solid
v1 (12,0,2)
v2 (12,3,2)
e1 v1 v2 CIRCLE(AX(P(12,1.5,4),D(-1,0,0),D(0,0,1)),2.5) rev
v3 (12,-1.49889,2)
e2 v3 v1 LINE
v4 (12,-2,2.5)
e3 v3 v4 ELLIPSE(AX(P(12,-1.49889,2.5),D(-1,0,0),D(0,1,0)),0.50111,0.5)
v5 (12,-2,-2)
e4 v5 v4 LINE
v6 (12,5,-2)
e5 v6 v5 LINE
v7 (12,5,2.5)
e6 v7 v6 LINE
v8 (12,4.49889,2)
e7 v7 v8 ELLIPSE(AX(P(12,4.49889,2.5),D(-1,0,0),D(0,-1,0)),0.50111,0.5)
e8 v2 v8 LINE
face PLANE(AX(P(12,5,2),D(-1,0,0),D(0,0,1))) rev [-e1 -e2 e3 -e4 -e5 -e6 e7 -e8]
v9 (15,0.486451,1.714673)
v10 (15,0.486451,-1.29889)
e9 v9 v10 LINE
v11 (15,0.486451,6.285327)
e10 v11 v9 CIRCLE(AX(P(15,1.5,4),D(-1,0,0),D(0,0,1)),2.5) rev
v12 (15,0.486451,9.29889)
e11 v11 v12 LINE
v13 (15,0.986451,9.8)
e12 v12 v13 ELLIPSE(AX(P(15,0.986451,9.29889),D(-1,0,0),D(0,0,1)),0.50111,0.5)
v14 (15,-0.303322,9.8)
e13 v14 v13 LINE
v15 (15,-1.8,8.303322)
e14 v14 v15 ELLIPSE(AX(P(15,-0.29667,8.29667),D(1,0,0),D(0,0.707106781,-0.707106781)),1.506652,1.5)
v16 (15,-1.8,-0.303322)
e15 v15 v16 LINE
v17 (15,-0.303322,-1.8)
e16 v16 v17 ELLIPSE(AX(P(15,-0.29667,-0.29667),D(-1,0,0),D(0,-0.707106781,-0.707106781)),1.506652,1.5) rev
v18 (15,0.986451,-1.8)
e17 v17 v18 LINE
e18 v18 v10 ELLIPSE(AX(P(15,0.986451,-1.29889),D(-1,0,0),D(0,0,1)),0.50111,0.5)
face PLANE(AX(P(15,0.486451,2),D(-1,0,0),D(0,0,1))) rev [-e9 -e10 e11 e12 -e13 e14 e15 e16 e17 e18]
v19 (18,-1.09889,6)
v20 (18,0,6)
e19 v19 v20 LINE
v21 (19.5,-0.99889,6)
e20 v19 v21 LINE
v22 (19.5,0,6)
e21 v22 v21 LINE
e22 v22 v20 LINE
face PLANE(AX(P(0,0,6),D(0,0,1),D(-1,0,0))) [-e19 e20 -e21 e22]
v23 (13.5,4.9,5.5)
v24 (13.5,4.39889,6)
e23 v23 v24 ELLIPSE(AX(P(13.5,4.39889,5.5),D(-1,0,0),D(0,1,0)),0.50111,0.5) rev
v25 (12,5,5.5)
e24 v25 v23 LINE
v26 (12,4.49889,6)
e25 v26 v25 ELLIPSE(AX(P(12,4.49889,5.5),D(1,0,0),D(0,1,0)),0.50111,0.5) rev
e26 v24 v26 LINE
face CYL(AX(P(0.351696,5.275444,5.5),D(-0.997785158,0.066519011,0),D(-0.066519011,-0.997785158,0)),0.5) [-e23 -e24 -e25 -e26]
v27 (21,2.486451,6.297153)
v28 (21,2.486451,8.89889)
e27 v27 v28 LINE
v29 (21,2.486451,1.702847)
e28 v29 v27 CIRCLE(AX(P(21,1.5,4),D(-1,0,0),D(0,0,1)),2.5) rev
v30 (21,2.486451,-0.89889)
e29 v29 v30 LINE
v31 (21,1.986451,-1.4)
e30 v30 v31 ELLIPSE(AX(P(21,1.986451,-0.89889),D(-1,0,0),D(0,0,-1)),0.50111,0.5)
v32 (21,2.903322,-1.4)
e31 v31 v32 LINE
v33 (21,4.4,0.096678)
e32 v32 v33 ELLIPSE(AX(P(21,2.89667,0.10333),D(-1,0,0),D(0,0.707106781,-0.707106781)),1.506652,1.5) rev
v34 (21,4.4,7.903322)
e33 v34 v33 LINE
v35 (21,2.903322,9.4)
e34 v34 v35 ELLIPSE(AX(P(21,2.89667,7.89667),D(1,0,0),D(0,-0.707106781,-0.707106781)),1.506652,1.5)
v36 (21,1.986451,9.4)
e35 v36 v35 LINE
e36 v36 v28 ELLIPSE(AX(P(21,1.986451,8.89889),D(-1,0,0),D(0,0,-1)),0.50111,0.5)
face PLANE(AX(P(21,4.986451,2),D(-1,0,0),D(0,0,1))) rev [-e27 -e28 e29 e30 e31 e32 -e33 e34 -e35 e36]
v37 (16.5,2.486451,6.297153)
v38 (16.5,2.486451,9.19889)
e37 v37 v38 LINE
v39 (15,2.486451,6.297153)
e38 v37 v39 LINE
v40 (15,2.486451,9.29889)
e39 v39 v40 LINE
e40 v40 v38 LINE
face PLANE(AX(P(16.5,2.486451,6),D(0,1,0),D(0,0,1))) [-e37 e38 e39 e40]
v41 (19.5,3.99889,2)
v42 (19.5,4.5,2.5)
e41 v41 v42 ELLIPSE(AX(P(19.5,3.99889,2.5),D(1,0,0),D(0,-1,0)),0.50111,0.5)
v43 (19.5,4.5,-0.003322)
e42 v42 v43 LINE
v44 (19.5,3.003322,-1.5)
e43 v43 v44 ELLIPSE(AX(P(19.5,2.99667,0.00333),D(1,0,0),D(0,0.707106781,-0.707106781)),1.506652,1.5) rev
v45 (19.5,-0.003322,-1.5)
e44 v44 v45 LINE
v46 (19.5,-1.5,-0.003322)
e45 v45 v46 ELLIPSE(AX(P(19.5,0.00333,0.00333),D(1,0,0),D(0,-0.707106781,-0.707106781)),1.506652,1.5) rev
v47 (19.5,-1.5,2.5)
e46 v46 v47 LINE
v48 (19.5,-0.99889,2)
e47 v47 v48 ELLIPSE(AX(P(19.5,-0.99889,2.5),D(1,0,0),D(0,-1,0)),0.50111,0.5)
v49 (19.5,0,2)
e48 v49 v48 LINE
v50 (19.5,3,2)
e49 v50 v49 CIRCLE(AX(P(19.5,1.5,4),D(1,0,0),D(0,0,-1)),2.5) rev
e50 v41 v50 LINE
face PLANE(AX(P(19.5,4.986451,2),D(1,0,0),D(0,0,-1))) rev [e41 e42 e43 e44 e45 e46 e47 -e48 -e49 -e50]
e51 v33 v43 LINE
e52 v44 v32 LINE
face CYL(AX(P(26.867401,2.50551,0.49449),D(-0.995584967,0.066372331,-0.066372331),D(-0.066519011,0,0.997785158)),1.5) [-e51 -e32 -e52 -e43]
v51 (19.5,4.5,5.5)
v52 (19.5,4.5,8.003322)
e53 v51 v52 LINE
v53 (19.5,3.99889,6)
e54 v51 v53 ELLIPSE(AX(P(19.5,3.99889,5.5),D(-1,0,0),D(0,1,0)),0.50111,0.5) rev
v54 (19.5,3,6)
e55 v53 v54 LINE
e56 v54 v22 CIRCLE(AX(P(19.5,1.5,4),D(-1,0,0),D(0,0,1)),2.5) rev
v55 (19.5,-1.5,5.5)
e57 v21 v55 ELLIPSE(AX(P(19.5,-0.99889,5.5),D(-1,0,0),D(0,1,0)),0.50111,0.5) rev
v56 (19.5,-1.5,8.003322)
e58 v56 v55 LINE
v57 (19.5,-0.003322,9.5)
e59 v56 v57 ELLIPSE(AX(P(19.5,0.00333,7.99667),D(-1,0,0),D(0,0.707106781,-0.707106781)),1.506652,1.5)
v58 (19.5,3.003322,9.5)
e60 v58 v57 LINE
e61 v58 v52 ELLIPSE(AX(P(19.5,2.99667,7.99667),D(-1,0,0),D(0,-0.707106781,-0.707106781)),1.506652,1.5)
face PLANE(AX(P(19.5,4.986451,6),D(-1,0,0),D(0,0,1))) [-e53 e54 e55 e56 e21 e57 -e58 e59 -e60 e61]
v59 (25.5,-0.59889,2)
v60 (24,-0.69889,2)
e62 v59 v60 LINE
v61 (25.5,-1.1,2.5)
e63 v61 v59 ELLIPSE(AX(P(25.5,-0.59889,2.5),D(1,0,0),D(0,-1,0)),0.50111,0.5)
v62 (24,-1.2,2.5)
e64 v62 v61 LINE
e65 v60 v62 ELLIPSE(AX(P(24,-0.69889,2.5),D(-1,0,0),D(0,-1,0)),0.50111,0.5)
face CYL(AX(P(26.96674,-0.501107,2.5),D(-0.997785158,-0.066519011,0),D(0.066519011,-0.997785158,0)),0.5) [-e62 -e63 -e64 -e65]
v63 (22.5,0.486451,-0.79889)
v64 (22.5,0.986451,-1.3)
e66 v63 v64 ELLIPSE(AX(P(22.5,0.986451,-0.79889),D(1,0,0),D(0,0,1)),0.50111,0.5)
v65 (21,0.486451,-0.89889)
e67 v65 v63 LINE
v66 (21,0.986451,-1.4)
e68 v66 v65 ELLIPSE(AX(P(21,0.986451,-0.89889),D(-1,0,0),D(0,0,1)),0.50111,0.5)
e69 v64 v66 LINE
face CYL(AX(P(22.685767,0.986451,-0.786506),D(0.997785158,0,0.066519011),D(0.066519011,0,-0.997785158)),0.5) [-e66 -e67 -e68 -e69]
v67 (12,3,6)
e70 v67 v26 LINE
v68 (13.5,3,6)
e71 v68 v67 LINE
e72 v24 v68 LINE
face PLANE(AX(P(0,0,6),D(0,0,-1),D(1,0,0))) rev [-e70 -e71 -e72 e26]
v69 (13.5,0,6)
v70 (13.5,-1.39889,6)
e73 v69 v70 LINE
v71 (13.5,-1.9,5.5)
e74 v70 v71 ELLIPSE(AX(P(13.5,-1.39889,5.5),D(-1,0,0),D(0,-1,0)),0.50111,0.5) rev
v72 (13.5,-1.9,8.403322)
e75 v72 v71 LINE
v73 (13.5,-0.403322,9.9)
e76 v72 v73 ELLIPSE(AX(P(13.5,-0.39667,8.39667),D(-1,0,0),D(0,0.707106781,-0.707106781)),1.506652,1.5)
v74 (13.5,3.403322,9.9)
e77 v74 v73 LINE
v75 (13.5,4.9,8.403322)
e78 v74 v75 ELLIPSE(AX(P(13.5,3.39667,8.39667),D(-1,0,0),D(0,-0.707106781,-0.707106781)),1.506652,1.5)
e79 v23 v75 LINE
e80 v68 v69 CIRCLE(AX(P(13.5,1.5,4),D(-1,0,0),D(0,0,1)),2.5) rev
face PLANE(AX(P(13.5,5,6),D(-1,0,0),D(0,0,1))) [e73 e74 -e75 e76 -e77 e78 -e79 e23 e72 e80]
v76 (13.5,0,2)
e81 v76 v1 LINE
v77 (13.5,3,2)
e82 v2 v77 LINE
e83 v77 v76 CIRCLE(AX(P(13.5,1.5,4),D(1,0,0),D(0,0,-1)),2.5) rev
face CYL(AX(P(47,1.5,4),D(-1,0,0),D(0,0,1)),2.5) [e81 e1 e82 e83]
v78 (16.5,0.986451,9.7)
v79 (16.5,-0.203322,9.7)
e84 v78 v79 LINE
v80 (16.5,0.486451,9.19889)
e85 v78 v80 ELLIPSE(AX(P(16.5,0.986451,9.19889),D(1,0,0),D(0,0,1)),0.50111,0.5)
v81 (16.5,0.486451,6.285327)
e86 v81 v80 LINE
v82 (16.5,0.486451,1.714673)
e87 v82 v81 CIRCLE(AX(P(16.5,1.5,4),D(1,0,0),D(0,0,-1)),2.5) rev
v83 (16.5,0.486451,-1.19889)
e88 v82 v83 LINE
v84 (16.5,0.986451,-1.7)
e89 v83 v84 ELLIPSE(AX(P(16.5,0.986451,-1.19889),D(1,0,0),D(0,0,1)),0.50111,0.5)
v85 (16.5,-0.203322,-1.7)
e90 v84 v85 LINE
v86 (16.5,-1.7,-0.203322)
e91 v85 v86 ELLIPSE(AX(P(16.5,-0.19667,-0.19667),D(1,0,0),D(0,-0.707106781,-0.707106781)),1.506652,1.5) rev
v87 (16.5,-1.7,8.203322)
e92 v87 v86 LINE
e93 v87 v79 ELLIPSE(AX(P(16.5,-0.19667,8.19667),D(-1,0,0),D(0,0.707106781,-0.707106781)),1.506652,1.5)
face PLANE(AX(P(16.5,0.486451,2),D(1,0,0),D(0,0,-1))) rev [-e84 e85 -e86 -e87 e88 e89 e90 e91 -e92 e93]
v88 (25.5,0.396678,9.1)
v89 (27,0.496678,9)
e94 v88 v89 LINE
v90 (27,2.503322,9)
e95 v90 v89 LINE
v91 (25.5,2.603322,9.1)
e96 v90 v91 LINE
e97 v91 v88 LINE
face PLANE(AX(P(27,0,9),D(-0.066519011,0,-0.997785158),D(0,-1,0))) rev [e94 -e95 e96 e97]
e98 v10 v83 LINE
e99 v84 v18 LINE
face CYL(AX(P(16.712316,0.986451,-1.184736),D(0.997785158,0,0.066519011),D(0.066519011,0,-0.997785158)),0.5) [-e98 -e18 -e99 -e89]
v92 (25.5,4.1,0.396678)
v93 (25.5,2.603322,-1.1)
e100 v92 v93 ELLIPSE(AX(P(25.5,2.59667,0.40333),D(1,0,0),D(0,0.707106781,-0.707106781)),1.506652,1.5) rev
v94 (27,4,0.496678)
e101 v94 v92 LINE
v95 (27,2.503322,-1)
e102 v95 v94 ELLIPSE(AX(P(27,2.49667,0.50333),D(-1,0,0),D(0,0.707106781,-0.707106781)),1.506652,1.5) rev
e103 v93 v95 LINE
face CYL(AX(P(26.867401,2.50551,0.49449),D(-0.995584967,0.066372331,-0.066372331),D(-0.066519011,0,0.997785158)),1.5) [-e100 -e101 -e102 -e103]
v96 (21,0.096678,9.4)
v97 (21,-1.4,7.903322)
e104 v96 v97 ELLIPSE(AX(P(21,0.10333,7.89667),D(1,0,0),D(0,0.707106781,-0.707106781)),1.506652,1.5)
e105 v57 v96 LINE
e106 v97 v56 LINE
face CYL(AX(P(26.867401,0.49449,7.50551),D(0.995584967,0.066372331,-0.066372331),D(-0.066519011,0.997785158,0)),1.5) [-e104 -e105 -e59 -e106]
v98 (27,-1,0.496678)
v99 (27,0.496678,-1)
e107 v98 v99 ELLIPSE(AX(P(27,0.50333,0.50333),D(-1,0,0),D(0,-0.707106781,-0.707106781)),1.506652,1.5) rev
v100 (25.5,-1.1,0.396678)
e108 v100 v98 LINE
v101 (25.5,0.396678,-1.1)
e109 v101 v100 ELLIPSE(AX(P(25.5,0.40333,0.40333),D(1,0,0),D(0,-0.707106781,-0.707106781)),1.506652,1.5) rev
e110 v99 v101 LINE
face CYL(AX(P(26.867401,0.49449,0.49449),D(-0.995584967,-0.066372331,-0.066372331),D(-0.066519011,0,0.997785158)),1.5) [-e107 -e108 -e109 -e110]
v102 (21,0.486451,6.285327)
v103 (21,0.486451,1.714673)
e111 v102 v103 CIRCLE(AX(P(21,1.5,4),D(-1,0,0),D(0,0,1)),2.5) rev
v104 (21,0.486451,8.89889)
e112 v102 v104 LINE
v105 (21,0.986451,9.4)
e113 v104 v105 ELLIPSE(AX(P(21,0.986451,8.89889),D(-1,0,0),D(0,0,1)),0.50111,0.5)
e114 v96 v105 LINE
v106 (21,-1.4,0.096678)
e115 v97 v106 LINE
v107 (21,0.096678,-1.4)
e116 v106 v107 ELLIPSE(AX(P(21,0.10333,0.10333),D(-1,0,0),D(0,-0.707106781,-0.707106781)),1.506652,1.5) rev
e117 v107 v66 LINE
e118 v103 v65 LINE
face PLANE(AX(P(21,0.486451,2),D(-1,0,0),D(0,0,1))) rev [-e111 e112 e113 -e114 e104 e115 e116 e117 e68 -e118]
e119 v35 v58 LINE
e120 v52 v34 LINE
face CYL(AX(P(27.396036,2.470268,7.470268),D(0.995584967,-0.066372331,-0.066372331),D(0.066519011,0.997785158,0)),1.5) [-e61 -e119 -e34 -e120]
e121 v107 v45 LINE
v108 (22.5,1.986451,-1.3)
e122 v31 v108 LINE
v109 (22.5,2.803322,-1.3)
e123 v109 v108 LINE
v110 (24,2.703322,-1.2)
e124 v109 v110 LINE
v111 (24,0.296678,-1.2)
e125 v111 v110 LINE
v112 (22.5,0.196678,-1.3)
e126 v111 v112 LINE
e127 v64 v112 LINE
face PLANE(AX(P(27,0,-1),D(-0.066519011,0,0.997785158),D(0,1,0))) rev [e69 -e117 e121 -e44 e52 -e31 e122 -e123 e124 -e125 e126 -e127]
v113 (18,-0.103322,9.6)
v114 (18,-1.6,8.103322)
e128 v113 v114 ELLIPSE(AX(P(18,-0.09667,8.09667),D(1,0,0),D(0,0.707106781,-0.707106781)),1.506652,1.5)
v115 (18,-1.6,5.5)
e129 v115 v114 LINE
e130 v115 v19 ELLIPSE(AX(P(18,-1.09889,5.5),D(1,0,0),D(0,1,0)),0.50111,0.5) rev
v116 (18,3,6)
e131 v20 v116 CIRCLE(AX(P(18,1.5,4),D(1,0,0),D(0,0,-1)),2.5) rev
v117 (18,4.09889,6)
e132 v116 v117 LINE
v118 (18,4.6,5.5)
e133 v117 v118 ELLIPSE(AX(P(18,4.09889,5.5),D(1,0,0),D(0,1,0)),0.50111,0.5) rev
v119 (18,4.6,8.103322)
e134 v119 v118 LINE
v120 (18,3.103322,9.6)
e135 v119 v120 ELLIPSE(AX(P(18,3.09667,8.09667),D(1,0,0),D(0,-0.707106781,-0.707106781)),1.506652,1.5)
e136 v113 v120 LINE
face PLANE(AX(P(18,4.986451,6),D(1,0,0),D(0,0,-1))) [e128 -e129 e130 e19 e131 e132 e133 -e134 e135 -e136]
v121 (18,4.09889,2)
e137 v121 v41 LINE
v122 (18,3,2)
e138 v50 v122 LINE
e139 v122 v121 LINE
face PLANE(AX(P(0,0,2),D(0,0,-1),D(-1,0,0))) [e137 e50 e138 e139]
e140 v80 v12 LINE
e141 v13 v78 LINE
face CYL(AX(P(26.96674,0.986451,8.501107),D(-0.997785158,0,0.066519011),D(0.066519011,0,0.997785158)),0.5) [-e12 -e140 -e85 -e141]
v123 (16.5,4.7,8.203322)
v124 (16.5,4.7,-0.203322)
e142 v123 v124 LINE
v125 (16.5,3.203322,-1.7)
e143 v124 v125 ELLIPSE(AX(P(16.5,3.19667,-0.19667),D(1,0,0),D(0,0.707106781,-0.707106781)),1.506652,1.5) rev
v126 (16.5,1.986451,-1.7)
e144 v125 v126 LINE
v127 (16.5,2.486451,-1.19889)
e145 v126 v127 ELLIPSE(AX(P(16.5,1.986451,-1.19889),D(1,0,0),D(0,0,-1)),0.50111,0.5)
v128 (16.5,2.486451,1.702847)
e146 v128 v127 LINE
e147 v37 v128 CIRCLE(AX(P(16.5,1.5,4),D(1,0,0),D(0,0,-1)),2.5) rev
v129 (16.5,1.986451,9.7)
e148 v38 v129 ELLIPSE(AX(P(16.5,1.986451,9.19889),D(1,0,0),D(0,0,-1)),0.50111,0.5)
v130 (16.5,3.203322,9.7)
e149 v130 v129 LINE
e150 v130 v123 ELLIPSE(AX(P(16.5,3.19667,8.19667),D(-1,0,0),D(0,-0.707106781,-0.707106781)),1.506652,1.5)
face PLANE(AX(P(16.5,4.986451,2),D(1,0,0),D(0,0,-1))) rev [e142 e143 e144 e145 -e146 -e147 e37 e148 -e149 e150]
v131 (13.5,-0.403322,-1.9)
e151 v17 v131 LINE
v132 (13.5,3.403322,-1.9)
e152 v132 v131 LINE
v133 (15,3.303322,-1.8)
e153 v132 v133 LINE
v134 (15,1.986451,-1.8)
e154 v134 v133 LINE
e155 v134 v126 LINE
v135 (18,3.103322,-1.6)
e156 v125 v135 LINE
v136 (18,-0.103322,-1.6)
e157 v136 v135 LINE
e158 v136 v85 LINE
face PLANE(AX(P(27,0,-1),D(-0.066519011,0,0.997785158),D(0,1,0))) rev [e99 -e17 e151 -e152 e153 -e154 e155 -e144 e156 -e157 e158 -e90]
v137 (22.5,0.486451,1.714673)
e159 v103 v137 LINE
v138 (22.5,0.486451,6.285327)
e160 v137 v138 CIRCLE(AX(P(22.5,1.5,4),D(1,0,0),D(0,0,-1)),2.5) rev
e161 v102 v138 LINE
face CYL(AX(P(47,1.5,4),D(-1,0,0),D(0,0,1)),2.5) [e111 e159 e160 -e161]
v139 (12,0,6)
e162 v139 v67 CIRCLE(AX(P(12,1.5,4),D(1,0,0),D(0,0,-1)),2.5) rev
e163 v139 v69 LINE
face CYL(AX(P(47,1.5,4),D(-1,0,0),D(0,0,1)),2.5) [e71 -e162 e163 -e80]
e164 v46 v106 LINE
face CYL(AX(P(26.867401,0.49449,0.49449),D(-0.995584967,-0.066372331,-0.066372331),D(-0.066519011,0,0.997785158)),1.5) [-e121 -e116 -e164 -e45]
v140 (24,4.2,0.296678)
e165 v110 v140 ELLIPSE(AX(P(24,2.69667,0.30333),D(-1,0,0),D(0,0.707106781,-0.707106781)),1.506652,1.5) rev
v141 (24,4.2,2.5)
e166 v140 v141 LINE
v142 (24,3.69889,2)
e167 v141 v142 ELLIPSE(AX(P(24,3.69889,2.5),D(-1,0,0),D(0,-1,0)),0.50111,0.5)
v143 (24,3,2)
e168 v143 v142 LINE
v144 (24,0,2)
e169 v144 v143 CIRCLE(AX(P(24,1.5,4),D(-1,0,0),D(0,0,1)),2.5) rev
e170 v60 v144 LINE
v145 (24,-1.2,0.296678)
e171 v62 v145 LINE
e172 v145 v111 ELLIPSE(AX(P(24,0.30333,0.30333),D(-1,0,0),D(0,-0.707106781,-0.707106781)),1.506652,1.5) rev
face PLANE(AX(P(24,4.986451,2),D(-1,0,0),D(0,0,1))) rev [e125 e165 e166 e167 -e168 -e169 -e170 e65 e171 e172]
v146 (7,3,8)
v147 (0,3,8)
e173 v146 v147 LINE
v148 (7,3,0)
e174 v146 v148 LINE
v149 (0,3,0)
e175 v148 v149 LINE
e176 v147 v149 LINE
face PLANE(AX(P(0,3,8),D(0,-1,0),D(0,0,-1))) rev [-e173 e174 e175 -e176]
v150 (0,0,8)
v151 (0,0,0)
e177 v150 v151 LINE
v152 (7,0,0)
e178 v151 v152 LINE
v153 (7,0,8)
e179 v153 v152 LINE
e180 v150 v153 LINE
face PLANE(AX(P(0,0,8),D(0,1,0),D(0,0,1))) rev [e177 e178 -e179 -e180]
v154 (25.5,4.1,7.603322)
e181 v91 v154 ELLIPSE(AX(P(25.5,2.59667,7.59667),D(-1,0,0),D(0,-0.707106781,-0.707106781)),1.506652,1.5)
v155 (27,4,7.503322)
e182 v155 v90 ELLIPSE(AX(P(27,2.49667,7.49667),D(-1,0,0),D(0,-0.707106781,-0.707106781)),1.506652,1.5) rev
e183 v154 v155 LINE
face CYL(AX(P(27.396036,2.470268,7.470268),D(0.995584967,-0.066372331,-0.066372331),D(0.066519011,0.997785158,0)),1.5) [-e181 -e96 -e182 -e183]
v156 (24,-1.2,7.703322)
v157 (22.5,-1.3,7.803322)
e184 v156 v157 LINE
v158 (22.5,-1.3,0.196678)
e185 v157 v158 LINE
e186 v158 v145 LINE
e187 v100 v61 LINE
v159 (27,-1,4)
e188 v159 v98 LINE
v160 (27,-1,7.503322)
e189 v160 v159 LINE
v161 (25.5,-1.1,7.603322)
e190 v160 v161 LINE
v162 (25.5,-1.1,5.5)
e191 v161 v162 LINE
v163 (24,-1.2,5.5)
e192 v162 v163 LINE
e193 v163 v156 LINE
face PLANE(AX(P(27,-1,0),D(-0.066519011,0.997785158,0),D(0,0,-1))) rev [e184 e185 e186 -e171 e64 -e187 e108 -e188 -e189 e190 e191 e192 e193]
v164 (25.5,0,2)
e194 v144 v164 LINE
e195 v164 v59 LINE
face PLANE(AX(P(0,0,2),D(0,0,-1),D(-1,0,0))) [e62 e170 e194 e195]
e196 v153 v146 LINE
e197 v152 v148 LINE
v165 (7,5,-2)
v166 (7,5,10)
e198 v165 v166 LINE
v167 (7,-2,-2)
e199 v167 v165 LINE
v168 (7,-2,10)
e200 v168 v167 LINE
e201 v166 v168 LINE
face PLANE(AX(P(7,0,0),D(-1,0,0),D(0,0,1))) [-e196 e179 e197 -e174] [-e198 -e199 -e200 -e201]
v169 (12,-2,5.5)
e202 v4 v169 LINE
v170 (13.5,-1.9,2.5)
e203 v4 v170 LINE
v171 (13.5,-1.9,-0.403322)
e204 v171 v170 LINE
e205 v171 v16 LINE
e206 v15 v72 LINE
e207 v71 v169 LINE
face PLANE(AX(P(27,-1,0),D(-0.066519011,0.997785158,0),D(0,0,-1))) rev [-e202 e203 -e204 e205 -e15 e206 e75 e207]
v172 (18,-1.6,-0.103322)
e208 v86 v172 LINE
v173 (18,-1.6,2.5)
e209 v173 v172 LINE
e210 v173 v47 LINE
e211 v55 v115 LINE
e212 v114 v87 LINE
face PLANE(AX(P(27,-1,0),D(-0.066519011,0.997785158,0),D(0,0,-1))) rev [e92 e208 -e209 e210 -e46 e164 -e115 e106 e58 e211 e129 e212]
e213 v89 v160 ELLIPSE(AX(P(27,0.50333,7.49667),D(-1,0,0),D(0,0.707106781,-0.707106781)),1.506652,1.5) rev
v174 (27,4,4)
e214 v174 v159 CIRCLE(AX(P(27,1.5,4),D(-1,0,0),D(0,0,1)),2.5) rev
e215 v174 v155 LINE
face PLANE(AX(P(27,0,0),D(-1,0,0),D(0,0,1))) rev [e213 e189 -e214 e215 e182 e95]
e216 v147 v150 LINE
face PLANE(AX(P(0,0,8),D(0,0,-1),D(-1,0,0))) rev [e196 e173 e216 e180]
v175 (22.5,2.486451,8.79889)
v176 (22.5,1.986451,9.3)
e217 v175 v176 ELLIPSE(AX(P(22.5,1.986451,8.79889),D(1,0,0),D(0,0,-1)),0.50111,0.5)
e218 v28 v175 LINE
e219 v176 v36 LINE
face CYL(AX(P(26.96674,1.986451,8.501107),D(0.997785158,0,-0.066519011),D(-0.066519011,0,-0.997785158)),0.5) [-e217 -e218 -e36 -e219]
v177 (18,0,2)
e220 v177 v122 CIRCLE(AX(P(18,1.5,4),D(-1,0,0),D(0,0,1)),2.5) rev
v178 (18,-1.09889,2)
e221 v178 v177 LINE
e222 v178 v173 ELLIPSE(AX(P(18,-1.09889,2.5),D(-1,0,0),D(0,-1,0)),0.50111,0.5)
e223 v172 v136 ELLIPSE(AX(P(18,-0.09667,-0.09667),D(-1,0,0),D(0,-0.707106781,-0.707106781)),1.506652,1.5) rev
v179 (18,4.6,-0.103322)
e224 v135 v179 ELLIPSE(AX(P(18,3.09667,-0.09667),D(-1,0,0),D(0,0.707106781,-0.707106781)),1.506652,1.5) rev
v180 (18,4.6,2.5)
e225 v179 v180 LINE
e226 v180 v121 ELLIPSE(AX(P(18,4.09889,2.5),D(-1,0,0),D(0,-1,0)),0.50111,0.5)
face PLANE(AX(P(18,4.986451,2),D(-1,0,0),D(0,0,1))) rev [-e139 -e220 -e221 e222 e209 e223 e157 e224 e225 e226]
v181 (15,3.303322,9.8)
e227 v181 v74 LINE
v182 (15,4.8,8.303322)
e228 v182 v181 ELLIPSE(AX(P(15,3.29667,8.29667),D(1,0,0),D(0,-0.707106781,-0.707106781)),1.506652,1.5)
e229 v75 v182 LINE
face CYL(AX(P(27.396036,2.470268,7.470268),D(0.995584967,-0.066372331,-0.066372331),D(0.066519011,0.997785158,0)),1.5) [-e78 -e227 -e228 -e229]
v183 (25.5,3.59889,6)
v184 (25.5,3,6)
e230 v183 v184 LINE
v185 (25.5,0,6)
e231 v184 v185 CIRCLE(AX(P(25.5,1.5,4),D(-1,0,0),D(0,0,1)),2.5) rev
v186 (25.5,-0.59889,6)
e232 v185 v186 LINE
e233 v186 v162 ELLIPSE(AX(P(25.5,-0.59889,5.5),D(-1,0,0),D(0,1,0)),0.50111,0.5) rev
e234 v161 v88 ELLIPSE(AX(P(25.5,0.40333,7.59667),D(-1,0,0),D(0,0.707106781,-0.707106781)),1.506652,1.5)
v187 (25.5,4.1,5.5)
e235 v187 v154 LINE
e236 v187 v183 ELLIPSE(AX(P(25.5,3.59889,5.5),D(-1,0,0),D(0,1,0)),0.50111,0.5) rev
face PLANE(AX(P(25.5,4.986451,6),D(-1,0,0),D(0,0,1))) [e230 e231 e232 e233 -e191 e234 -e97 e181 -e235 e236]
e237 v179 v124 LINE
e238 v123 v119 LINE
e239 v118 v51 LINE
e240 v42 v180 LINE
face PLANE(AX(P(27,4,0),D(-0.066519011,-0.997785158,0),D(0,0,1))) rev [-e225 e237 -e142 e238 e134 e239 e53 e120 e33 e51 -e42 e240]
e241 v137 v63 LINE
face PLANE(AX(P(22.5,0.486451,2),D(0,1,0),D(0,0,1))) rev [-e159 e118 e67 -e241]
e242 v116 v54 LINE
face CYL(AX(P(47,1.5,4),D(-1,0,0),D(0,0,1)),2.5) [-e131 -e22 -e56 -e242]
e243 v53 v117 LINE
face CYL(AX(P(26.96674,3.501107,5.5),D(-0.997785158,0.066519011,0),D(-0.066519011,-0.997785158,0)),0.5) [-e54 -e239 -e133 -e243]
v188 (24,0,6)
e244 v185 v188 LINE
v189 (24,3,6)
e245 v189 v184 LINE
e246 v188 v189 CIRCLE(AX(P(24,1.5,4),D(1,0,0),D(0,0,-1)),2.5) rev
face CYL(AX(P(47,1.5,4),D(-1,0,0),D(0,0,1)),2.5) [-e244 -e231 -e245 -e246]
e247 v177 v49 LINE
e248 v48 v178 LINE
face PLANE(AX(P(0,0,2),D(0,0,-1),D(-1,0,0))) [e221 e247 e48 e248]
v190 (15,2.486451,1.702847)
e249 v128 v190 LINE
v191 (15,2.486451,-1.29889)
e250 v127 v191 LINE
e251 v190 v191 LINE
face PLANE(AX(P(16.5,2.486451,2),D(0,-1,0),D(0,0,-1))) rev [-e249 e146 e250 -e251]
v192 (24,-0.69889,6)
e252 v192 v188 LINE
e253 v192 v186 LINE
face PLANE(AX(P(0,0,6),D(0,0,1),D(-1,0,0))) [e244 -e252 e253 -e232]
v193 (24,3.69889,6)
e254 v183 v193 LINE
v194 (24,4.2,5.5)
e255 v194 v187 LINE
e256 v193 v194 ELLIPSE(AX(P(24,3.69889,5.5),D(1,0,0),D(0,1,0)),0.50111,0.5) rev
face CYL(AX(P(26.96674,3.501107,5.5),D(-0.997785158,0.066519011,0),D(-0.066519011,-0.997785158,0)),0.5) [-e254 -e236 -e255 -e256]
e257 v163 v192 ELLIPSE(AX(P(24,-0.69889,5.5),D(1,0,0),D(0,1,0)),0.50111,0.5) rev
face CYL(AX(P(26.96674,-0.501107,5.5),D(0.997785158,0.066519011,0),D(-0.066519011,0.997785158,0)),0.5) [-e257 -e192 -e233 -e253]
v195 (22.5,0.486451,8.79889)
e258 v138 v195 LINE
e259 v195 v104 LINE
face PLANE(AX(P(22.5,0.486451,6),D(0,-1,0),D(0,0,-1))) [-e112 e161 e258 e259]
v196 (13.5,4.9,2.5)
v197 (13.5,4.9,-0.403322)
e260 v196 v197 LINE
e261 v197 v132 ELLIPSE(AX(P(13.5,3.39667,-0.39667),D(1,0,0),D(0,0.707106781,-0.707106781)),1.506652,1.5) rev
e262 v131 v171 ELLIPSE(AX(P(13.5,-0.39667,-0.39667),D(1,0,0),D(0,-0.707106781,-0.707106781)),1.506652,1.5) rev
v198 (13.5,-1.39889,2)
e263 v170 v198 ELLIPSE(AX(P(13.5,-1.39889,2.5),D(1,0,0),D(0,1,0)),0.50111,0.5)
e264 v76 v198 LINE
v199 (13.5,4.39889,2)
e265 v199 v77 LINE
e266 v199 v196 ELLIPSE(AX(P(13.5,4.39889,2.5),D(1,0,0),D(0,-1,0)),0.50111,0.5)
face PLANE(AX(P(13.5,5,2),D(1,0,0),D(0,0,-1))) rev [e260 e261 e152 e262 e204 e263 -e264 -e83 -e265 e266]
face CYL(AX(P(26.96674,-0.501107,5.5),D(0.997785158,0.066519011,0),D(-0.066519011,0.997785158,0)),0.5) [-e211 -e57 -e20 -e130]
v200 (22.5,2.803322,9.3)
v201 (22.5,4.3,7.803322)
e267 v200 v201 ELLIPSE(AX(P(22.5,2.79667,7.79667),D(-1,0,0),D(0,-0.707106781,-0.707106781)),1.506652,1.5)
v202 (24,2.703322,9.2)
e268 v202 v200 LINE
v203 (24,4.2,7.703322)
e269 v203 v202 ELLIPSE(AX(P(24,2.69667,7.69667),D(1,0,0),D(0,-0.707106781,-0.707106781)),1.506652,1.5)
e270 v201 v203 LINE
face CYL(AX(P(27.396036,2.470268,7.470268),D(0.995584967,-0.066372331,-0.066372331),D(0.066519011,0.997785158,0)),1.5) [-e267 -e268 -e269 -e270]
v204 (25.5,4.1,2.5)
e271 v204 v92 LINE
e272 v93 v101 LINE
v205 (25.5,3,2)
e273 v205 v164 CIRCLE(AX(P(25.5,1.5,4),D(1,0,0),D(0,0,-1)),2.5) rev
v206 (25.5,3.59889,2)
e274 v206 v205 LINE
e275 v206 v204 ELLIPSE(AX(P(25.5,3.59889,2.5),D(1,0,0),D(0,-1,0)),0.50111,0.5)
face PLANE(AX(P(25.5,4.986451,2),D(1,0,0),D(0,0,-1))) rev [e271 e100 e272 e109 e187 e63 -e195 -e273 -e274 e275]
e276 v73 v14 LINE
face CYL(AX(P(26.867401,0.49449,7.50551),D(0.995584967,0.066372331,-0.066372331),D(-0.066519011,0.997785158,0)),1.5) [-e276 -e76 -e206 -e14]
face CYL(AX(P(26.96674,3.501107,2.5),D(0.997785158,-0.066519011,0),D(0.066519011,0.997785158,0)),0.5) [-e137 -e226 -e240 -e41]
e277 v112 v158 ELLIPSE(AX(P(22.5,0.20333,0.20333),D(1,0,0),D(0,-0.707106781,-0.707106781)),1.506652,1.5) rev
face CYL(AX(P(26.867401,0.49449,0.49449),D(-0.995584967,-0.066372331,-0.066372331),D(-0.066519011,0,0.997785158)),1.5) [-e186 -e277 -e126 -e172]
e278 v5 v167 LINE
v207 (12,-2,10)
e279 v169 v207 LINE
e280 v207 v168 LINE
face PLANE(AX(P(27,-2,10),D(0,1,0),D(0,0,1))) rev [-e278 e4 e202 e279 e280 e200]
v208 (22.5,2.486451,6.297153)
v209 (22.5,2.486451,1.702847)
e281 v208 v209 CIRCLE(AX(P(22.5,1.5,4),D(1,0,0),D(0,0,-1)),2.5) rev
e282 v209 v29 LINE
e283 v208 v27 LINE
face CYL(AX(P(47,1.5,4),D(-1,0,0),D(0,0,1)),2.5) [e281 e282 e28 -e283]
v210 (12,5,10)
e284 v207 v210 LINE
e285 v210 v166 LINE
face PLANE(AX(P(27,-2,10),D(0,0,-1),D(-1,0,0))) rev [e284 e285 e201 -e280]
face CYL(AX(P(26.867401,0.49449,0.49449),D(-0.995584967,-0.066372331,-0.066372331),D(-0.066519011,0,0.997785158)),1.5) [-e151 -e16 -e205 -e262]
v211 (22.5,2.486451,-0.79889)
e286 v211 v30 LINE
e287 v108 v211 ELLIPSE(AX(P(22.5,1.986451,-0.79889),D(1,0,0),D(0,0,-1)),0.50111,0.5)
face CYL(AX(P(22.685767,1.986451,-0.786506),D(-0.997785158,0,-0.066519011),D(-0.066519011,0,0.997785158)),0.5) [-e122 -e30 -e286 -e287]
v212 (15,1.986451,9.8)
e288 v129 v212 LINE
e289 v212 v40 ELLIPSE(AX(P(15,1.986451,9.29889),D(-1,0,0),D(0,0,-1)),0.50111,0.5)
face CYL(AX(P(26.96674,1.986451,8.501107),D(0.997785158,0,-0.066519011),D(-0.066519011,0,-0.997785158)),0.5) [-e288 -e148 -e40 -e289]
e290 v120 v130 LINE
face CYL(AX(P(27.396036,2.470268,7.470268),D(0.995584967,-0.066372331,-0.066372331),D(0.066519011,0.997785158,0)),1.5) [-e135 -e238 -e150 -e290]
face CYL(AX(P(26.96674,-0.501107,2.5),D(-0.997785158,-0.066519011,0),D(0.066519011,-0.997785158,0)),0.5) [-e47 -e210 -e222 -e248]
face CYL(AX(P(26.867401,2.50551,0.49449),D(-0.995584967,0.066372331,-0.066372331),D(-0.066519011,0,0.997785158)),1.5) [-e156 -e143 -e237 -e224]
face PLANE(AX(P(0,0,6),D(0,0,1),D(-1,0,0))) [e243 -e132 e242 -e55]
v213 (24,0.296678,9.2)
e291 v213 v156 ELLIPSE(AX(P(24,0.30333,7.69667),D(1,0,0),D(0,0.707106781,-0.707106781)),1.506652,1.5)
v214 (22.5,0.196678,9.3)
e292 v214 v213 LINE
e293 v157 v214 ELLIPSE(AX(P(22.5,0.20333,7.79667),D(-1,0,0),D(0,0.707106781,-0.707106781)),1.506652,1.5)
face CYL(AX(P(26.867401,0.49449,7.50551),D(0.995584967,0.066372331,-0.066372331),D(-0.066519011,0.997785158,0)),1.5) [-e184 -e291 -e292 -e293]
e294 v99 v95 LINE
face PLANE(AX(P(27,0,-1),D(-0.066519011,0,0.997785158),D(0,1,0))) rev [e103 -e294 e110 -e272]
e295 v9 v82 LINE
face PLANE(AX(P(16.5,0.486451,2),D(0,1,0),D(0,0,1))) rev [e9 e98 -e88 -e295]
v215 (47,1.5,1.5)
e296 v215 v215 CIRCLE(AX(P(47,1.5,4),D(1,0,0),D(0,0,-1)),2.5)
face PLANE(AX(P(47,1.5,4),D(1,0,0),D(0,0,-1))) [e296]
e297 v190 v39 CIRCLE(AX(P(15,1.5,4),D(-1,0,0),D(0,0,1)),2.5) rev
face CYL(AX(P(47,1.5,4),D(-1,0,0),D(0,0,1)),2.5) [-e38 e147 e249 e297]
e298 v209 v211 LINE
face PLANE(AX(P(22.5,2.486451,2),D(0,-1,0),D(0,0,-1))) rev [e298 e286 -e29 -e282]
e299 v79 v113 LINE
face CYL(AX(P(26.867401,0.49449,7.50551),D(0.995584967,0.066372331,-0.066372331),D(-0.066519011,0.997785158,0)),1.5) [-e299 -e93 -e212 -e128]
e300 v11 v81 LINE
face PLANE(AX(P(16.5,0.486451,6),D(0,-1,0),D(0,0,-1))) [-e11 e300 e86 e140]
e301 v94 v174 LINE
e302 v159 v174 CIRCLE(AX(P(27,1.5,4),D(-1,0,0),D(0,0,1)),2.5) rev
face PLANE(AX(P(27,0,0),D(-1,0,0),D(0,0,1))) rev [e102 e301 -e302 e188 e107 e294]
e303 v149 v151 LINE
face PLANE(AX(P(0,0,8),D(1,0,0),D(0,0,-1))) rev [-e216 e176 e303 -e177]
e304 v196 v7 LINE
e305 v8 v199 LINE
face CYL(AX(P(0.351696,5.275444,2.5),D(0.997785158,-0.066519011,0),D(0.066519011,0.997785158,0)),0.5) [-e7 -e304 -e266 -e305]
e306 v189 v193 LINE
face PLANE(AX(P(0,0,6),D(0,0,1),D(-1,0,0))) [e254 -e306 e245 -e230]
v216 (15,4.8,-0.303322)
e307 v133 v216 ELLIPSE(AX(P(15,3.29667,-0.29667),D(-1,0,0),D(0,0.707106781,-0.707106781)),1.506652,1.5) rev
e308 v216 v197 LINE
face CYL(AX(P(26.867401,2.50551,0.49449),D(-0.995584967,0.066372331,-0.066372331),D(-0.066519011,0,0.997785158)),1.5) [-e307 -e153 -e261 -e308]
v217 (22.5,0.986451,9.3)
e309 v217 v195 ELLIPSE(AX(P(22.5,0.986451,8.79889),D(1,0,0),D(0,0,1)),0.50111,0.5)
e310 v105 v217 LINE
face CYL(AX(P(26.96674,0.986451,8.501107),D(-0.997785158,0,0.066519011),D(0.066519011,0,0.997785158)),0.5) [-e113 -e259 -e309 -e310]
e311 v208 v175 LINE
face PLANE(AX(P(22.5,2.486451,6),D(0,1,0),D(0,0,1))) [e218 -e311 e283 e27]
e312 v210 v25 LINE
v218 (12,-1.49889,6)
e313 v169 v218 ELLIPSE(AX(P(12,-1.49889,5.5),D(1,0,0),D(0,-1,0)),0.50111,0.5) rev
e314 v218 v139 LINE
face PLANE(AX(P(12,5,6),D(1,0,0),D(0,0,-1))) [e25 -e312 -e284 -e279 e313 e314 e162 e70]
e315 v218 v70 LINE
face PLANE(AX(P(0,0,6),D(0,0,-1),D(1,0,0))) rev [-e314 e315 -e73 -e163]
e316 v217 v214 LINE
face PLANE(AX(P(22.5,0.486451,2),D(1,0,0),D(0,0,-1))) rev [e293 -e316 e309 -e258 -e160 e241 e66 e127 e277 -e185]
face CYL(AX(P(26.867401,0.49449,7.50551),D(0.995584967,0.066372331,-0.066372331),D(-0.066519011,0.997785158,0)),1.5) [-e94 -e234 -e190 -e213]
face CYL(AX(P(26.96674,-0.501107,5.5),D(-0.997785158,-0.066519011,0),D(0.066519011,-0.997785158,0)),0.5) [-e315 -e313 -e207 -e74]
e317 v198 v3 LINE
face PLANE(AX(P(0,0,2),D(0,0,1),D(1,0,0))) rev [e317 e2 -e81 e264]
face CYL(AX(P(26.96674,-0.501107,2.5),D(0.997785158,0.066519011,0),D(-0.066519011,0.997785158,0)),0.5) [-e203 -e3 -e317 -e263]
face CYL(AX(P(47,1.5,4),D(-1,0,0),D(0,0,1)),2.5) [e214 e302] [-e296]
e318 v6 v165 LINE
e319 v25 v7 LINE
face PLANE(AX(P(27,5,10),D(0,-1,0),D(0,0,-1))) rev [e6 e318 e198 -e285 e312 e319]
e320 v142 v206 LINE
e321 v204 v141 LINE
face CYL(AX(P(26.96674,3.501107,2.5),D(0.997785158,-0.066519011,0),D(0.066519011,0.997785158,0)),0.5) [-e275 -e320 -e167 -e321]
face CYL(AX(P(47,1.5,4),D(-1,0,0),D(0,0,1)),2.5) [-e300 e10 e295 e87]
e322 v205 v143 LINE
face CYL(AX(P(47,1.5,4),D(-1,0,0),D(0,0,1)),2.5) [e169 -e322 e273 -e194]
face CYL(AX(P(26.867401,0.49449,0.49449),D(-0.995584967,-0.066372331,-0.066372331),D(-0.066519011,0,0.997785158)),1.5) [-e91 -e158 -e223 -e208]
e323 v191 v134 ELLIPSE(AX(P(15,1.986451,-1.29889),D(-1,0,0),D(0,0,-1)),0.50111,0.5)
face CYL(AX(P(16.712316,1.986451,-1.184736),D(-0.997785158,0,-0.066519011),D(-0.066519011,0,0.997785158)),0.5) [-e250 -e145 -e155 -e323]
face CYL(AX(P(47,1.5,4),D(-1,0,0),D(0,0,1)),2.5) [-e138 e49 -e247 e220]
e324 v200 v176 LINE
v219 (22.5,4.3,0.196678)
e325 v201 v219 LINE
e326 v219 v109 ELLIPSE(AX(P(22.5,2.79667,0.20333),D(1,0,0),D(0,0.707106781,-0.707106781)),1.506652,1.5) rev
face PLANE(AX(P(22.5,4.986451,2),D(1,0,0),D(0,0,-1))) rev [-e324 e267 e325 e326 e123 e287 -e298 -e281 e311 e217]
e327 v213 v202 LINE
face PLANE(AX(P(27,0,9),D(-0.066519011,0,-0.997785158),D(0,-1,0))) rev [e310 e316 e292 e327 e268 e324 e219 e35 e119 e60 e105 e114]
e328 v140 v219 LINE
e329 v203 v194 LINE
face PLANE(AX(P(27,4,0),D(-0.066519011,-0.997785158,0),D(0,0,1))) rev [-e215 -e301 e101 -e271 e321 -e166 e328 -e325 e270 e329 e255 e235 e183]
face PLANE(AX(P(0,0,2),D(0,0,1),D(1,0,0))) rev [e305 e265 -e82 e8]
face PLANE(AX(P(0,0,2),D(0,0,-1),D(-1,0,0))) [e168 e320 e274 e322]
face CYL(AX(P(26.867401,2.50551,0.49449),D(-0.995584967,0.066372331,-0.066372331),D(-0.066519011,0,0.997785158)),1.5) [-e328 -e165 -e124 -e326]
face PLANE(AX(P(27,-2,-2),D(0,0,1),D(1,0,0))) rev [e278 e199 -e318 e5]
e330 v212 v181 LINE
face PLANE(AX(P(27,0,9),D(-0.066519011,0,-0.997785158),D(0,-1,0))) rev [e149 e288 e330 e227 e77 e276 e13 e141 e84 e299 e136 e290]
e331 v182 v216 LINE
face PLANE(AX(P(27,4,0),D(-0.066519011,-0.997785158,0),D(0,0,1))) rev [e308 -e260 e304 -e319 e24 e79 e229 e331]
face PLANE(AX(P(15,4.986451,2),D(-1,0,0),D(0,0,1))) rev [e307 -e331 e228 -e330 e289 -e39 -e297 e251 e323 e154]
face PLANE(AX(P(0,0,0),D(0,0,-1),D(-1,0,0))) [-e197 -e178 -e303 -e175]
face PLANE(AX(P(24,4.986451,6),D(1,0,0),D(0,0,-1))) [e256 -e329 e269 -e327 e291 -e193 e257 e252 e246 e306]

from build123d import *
from OCP.BRepFilletAPI import BRepFilletAPI_MakeChamfer

# Parameters (mm, degrees)
SKETCH_1_W           = 7
SKETCH_1_H           = 3
EXTRUDE_1_DEPTH      = 8
SKETCH_2_W           = 12
SKETCH_2_H           = 7
EXTRUDE_2_DEPTH      = 20
CHAMFER_1_SIZE       = 15
CHAMFER_1_SIZE2      = 1
SKETCH_4_W           = 1.5
SKETCH_4_H           = 2.5
SKETCH_4_H_2         = 2.51354888
SKETCH_4_H_3         = 2.48645112
CUT_EXTRUDE_1_DEPTH  = 4
FILLET_1_R           = 1.5
SKETCH_9_W           = 1.5
SKETCH_9_H           = 2
CUT_EXTRUDE_3_DEPTH  = 4
SKETCH_10_W          = 1.5
SKETCH_10_H          = 4
CUT_EXTRUDE_4_DEPTH  = 2.5
EXTRUDE_3_DEPTH      = 20
EXTRUDE_3_DEPTH_BACK = 20
SKETCH_11_R          = 2.5
FILLET_2_R           = 0.5
FILLET_3_R           = 0.5
FILLET_4_R           = 0.5
FILLET_5_R           = 0.5


with BuildPart() as part:
    # Эскиз1 → Бобышка-Вытянуть1 (new body)
    with BuildSketch(Plane.XY):
        with Locations((3.5, 1.5)):
            Rectangle(SKETCH_1_W, SKETCH_1_H)
    extrude(amount=EXTRUDE_1_DEPTH)

    # Эскиз2 → Бобышка-Вытянуть2 (add)
    with BuildSketch(Plane(origin=(7, 0, 0), x_dir=(0, 0, -1), z_dir=(1, 0, 0))):
        with Locations((-4, 1.5)):
            Rectangle(SKETCH_2_W, SKETCH_2_H)
    extrude(amount=EXTRUDE_2_DEPTH)

    # Фаска1: one chamfer whose edges measure the first distance from different faces: ONE call of the kernel's chamfer builder (chamfer() names one face for all edges)
    chamfer_1_edges_1 = [part.edges().sort_by_distance(p)[0] for p in [
        (27, 1.5, 10),
    ]]
    chamfer_1_side_1 = [part.faces().sort_by_distance(p)[0] for p in [
        (17, 1.5, 10),
    ]]
    chamfer_1_edges_2 = [part.edges().sort_by_distance(p)[0] for p in [
        (27, -2, 4),
    ]]
    chamfer_1_side_2 = [part.faces().sort_by_distance(p)[0] for p in [
        (17, -2, 4),
    ]]
    chamfer_1_edges_3 = [part.edges().sort_by_distance(p)[0] for p in [
        (27, 1.5, -2),
    ]]
    chamfer_1_side_3 = [part.faces().sort_by_distance(p)[0] for p in [
        (17, 1.5, -2),
    ]]
    chamfer_1_edges_4 = [part.edges().sort_by_distance(p)[0] for p in [
        (27, 5, 4),
    ]]
    chamfer_1_side_4 = [part.faces().sort_by_distance(p)[0] for p in [
        (17, 5, 4),
    ]]
    chamfer_1 = BRepFilletAPI_MakeChamfer(part.part.solid().wrapped)
    for e in chamfer_1_edges_1:
        chamfer_1.Add(CHAMFER_1_SIZE, CHAMFER_1_SIZE2, e.wrapped, chamfer_1_side_1[0].wrapped)  # the first distance lies on this face
    for e in chamfer_1_edges_2:
        chamfer_1.Add(CHAMFER_1_SIZE, CHAMFER_1_SIZE2, e.wrapped, chamfer_1_side_2[0].wrapped)  # the first distance lies on this face
    for e in chamfer_1_edges_3:
        chamfer_1.Add(CHAMFER_1_SIZE, CHAMFER_1_SIZE2, e.wrapped, chamfer_1_side_3[0].wrapped)  # the first distance lies on this face
    for e in chamfer_1_edges_4:
        chamfer_1.Add(CHAMFER_1_SIZE, CHAMFER_1_SIZE2, e.wrapped, chamfer_1_side_4[0].wrapped)  # the first distance lies on this face
    add(Compound.cast(chamfer_1.Shape()), mode=Mode.REPLACE)

    # Эскиз4 → Вырез-Вытянуть1 (cut)
    with BuildSketch(Plane(origin=(0, 0, -2), x_dir=(-1, 0, 0), z_dir=(0, 0, -1))):
        with Locations((-24.75, 3.73645112)):
            Rectangle(SKETCH_4_W, SKETCH_4_H)
        with Locations((-21.75, 3.73645112)):
            Rectangle(SKETCH_4_W, SKETCH_4_H)
        with Locations((-18.75, 3.73645112)):
            Rectangle(SKETCH_4_W, SKETCH_4_H)
        with Locations((-15.75, 3.73645112)):
            Rectangle(SKETCH_4_W, SKETCH_4_H)
        with Locations((-12.75, 3.74322556)):
            Rectangle(SKETCH_4_W, SKETCH_4_H_2)
        with Locations((-21.75, -0.76354888)):
            Rectangle(SKETCH_4_W, SKETCH_4_H)
        with Locations((-18.75, -0.76354888)):
            Rectangle(SKETCH_4_W, SKETCH_4_H)
        with Locations((-15.75, -0.76354888)):
            Rectangle(SKETCH_4_W, SKETCH_4_H)
        with Locations((-12.75, -0.75677444)):
            Rectangle(SKETCH_4_W, SKETCH_4_H_3)
        with Locations((-24.75, -0.76354888)):
            Rectangle(SKETCH_4_W, SKETCH_4_H)
    cut_extrude_1 = extrude(amount=-CUT_EXTRUDE_1_DEPTH, mode=Mode.SUBTRACT)

    # Зеркальное отражение1: Вырез-Вытянуть1 across plane
    add(cut_extrude_1.mirror(Plane.XY.offset(4)), mode=Mode.SUBTRACT)

    # Скругление1
    fillet_1_edges = [part.edges().sort_by_distance(p)[0] for p in [
        (20.25, -1.45, -1.45),
        (17.25, -1.65, -1.65),
        (14.25, -1.85, -1.85),
        (23.25, -1.25, -1.25),
        (26.25, 4.05, 9.05),
        (23.25, 4.25, 9.25),
        (20.25, 4.45, 9.45),
        (17.25, 4.65, 9.65),
        (14.25, 4.85, 9.85),
        (23.25, -1.25, 9.25),
        (20.25, -1.45, 9.45),
        (17.25, -1.65, 9.65),
        (26.25, -1.05, -1.05),
        (14.25, -1.85, 9.85),
        (26.25, 4.05, -1.05),
        (26.25, -1.05, 9.05),
        (23.25, 4.25, -1.25),
        (20.25, 4.45, -1.45),
        (17.25, 4.65, -1.65),
        (14.25, 4.85, -1.85),
    ]]
    fillet(fillet_1_edges, radius=FILLET_1_R)

    # Эскиз9 → Вырез-Вытянуть3 (cut)
    with BuildSketch(Plane.XY.offset(10)):
        with Locations((12.75, 1.48645112)):
            Rectangle(SKETCH_9_W, SKETCH_9_H)
        with Locations((18.75, 1.48645112)):
            Rectangle(SKETCH_9_W, SKETCH_9_H)
        with Locations((24.75, 1.48645112)):
            Rectangle(SKETCH_9_W, SKETCH_9_H)
    cut_extrude_3 = extrude(amount=-CUT_EXTRUDE_3_DEPTH, mode=Mode.SUBTRACT)

    # Зеркальное отражение2: Вырез-Вытянуть3 across plane
    add(cut_extrude_3.mirror(Plane.XY.offset(4)), mode=Mode.SUBTRACT)

    # Эскиз10 → Вырез-Вытянуть4 (cut)
    with BuildSketch(Plane(origin=(0, 5, 0), x_dir=(1, 0, 0), z_dir=(0, 1, 0))):
        with Locations((15.75, -4)):
            Rectangle(SKETCH_10_W, SKETCH_10_H)
        with Locations((21.75, -4)):
            Rectangle(SKETCH_10_W, SKETCH_10_H)
    cut_extrude_4 = extrude(amount=-CUT_EXTRUDE_4_DEPTH, mode=Mode.SUBTRACT)

    # Зеркальное отражение3: Вырез-Вытянуть4 across plane
    add(cut_extrude_4.mirror(Plane.ZX.offset(1.5)), mode=Mode.SUBTRACT)

    # Эскиз11 → Бобышка-Вытянуть3 (add, two sides: drawn at the far end of the back side and taken through both)
    with BuildSketch(Plane(origin=(27, 0, 0), x_dir=(0, 0, -1), z_dir=(1, 0, 0)).offset(-EXTRUDE_3_DEPTH_BACK)):
        with Locations(Location((-4, 1.5, 0), (0, 0, 270))):
            Circle(SKETCH_11_R)
    extrude(amount=EXTRUDE_3_DEPTH + EXTRUDE_3_DEPTH_BACK)

    # Скругление2
    # the kernel refuses this fillet: 0.5 mm, written as the material it takes off along each edge
    with BuildSketch(Plane(origin=(20.747231447, -1.416851237, 2), x_dir=(-0.06651901052377394, 0.997785157856609, 0), z_dir=(-0.9977851578566089, -0.06651901052377394, 0))) as fillet_2_piece_1_section:
        with BuildLine():
            CenterArc((FILLET_2_R, -FILLET_2_R), FILLET_2_R, 90, 90)
            Line((0, -FILLET_2_R), (0, 0))
            Line((0, 0), (FILLET_2_R, 0))
        make_face()
    fillet_2_piece_1 = extrude(amount=4.003329638, mode=Mode.PRIVATE)
    fillet_2_piece_1 = split(fillet_2_piece_1, bisect_by=Plane(origin=(19.5, -1.436551172, 2.113197557), z_dir=(-1, 0, 0)), keep=Keep.TOP, mode=Mode.PRIVATE)
    fillet_2_piece_1 = split(fillet_2_piece_1, bisect_by=Plane(origin=(18, -1.436551172, 2.113197557), z_dir=(1, 0, 0)), keep=Keep.TOP, mode=Mode.PRIVATE)
    add(fillet_2_piece_1, mode=Mode.SUBTRACT)
    with BuildSketch(Plane(origin=(14.747231447, -1.816851237, 2), x_dir=(0, 0, 1), z_dir=(-0.9977851578566089, -0.06651901052377394, 0))) as fillet_2_piece_2_section:
        with BuildLine():
            CenterArc((FILLET_2_R, FILLET_2_R), FILLET_2_R, 180, 90)
            Line((0, FILLET_2_R), (0, 0))
            Line((0, 0), (FILLET_2_R, 0))
        make_face()
    fillet_2_piece_2 = extrude(amount=4.003329638, mode=Mode.PRIVATE)
    fillet_2_piece_2 = split(fillet_2_piece_2, bisect_by=Plane(origin=(12, -1.836551172, 2.113197557), z_dir=(1, 0, 0)), keep=Keep.TOP, mode=Mode.PRIVATE)
    fillet_2_piece_2 = split(fillet_2_piece_2, bisect_by=Plane(origin=(13.5, -1.836551172, 2.113197557), z_dir=(-1, 0, 0)), keep=Keep.TOP, mode=Mode.PRIVATE)
    add(fillet_2_piece_2, mode=Mode.SUBTRACT)
    with BuildSketch(Plane(origin=(26.747231447, -1.016851237, 2), x_dir=(0, 0, 1), z_dir=(-0.9977851578566089, -0.06651901052377394, 0))) as fillet_2_piece_3_section:
        with BuildLine():
            CenterArc((FILLET_2_R, FILLET_2_R), FILLET_2_R, 180, 90)
            Line((0, FILLET_2_R), (0, 0))
            Line((0, 0), (FILLET_2_R, 0))
        make_face()
    fillet_2_piece_3 = extrude(amount=4.003329638, mode=Mode.PRIVATE)
    fillet_2_piece_3 = split(fillet_2_piece_3, bisect_by=Plane(origin=(25.5, -1.036551172, 2.113197557), z_dir=(-1, 0, 0)), keep=Keep.TOP, mode=Mode.PRIVATE)
    fillet_2_piece_3 = split(fillet_2_piece_3, bisect_by=Plane(origin=(24, -1.036551172, 2.113197557), z_dir=(1, 0, 0)), keep=Keep.TOP, mode=Mode.PRIVATE)
    add(fillet_2_piece_3, mode=Mode.SUBTRACT)
    with BuildSketch(Plane(origin=(20.747231447, -1.416851237, 6), x_dir=(0, 0, -1), z_dir=(-0.9977851578566089, -0.06651901052377394, 0))) as fillet_2_piece_4_section:
        with BuildLine():
            CenterArc((FILLET_2_R, -FILLET_2_R), FILLET_2_R, 90, 90)
            Line((0, -FILLET_2_R), (0, 0))
            Line((0, 0), (FILLET_2_R, 0))
        make_face()
    fillet_2_piece_4 = extrude(amount=4.003329638, mode=Mode.PRIVATE)
    fillet_2_piece_4 = split(fillet_2_piece_4, bisect_by=Plane(origin=(18, -1.436551172, 5.886802443), z_dir=(1, 0, 0)), keep=Keep.TOP, mode=Mode.PRIVATE)
    fillet_2_piece_4 = split(fillet_2_piece_4, bisect_by=Plane(origin=(19.5, -1.436551172, 5.886802443), z_dir=(-1, 0, 0)), keep=Keep.TOP, mode=Mode.PRIVATE)
    add(fillet_2_piece_4, mode=Mode.SUBTRACT)
    with BuildSketch(Plane(origin=(14.747231447, -1.816851237, 6), x_dir=(0, 0, -1), z_dir=(-0.9977851578566089, -0.06651901052377394, 0))) as fillet_2_piece_5_section:
        with BuildLine():
            CenterArc((FILLET_2_R, -FILLET_2_R), FILLET_2_R, 90, 90)
            Line((0, -FILLET_2_R), (0, 0))
            Line((0, 0), (FILLET_2_R, 0))
        make_face()
    fillet_2_piece_5 = extrude(amount=4.003329638, mode=Mode.PRIVATE)
    fillet_2_piece_5 = split(fillet_2_piece_5, bisect_by=Plane(origin=(12, -1.836551172, 5.886802443), z_dir=(1, 0, 0)), keep=Keep.TOP, mode=Mode.PRIVATE)
    fillet_2_piece_5 = split(fillet_2_piece_5, bisect_by=Plane(origin=(13.5, -1.836551172, 5.886802443), z_dir=(-1, 0, 0)), keep=Keep.TOP, mode=Mode.PRIVATE)
    add(fillet_2_piece_5, mode=Mode.SUBTRACT)
    with BuildSketch(Plane(origin=(26.747231447, -1.016851237, 6), x_dir=(0, 0, -1), z_dir=(-0.9977851578566089, -0.06651901052377394, 0))) as fillet_2_piece_6_section:
        with BuildLine():
            CenterArc((FILLET_2_R, -FILLET_2_R), FILLET_2_R, 90, 90)
            Line((0, -FILLET_2_R), (0, 0))
            Line((0, 0), (FILLET_2_R, 0))
        make_face()
    fillet_2_piece_6 = extrude(amount=4.003329638, mode=Mode.PRIVATE)
    fillet_2_piece_6 = split(fillet_2_piece_6, bisect_by=Plane(origin=(24, -1.036551172, 5.886802443), z_dir=(1, 0, 0)), keep=Keep.TOP, mode=Mode.PRIVATE)
    fillet_2_piece_6 = split(fillet_2_piece_6, bisect_by=Plane(origin=(25.5, -1.036551172, 5.886802443), z_dir=(-1, 0, 0)), keep=Keep.TOP, mode=Mode.PRIVATE)
    add(fillet_2_piece_6, mode=Mode.SUBTRACT)

    # Скругление3
    fillet_3_edges = [part.edges().sort_by_distance(p)[0] for p in [
        (21.75, 2.48645112, 9.35),
        (15.75, 2.48645112, 9.75),
        (21.75, 0.48645112, 9.35),
        (15.75, 0.48645112, 9.75),
    ]]
    fillet(fillet_3_edges, radius=FILLET_3_R)

    # Скругление4
    # the kernel refuses this fillet: 0.5 mm, written as the material it takes off along each edge
    with BuildSketch(Plane(origin=(14.747231447, 4.816851237, 2), x_dir=(0, 0, 1), z_dir=(-0.9977851578566089, 0.06651901052377394, 0))) as fillet_4_piece_1_section:
        with BuildLine():
            CenterArc((FILLET_4_R, -FILLET_4_R), FILLET_4_R, 90, 90)
            Line((0, -FILLET_4_R), (0, 0))
            Line((0, 0), (FILLET_4_R, 0))
        make_face()
    fillet_4_piece_1 = extrude(amount=4.003329638, mode=Mode.PRIVATE)
    fillet_4_piece_1 = split(fillet_4_piece_1, bisect_by=Plane(origin=(12, 4.836551172, 2.113197557), z_dir=(1, 0, 0)), keep=Keep.TOP, mode=Mode.PRIVATE)
    fillet_4_piece_1 = split(fillet_4_piece_1, bisect_by=Plane(origin=(13.5, 4.836551172, 2.113197557), z_dir=(-1, 0, 0)), keep=Keep.TOP, mode=Mode.PRIVATE)
    add(fillet_4_piece_1, mode=Mode.SUBTRACT)
    with BuildSketch(Plane(origin=(22.752768553, 4.283148763, 6), x_dir=(0, 0, -1), z_dir=(0.9977851578566089, -0.06651901052377394, 0))) as fillet_4_piece_2_section:
        with BuildLine():
            CenterArc((FILLET_4_R, -FILLET_4_R), FILLET_4_R, 90, 90)
            Line((0, -FILLET_4_R), (0, 0))
            Line((0, 0), (FILLET_4_R, 0))
        make_face()
    fillet_4_piece_2 = extrude(amount=4.003329638, mode=Mode.PRIVATE)
    fillet_4_piece_2 = split(fillet_4_piece_2, bisect_by=Plane(origin=(25.5, 4.036551172, 5.886802443), z_dir=(-1, 0, 0)), keep=Keep.TOP, mode=Mode.PRIVATE)
    fillet_4_piece_2 = split(fillet_4_piece_2, bisect_by=Plane(origin=(24, 4.036551172, 5.886802443), z_dir=(1, 0, 0)), keep=Keep.TOP, mode=Mode.PRIVATE)
    add(fillet_4_piece_2, mode=Mode.SUBTRACT)
    with BuildSketch(Plane(origin=(16.752768553, 4.683148763, 6), x_dir=(-0.06651901052377394, -0.997785157856609, 0), z_dir=(0.9977851578566089, -0.06651901052377394, 0))) as fillet_4_piece_3_section:
        with BuildLine():
            CenterArc((FILLET_4_R, FILLET_4_R), FILLET_4_R, 180, 90)
            Line((0, FILLET_4_R), (0, 0))
            Line((0, 0), (FILLET_4_R, 0))
        make_face()
    fillet_4_piece_3 = extrude(amount=4.003329638, mode=Mode.PRIVATE)
    fillet_4_piece_3 = split(fillet_4_piece_3, bisect_by=Plane(origin=(18, 4.436551172, 5.886802443), z_dir=(1, 0, 0)), keep=Keep.TOP, mode=Mode.PRIVATE)
    fillet_4_piece_3 = split(fillet_4_piece_3, bisect_by=Plane(origin=(19.5, 4.436551172, 5.886802443), z_dir=(-1, 0, 0)), keep=Keep.TOP, mode=Mode.PRIVATE)
    add(fillet_4_piece_3, mode=Mode.SUBTRACT)
    with BuildSketch(Plane(origin=(14.747231447, 4.816851237, 6), x_dir=(0, 0, -1), z_dir=(-0.9977851578566089, 0.06651901052377394, 0))) as fillet_4_piece_4_section:
        with BuildLine():
            CenterArc((FILLET_4_R, FILLET_4_R), FILLET_4_R, 180, 90)
            Line((0, FILLET_4_R), (0, 0))
            Line((0, 0), (FILLET_4_R, 0))
        make_face()
    fillet_4_piece_4 = extrude(amount=4.003329638, mode=Mode.PRIVATE)
    fillet_4_piece_4 = split(fillet_4_piece_4, bisect_by=Plane(origin=(13.5, 4.836551172, 5.886802443), z_dir=(-1, 0, 0)), keep=Keep.TOP, mode=Mode.PRIVATE)
    fillet_4_piece_4 = split(fillet_4_piece_4, bisect_by=Plane(origin=(12, 4.836551172, 5.886802443), z_dir=(1, 0, 0)), keep=Keep.TOP, mode=Mode.PRIVATE)
    add(fillet_4_piece_4, mode=Mode.SUBTRACT)
    with BuildSketch(Plane(origin=(22.752768553, 4.283148763, 2), x_dir=(0, 0, 1), z_dir=(0.9977851578566089, -0.06651901052377394, 0))) as fillet_4_piece_5_section:
        with BuildLine():
            CenterArc((FILLET_4_R, FILLET_4_R), FILLET_4_R, 180, 90)
            Line((0, FILLET_4_R), (0, 0))
            Line((0, 0), (FILLET_4_R, 0))
        make_face()
    fillet_4_piece_5 = extrude(amount=4.003329638, mode=Mode.PRIVATE)
    fillet_4_piece_5 = split(fillet_4_piece_5, bisect_by=Plane(origin=(24, 4.036551172, 2.113197557), z_dir=(1, 0, 0)), keep=Keep.TOP, mode=Mode.PRIVATE)
    fillet_4_piece_5 = split(fillet_4_piece_5, bisect_by=Plane(origin=(25.5, 4.036551172, 2.113197557), z_dir=(-1, 0, 0)), keep=Keep.TOP, mode=Mode.PRIVATE)
    add(fillet_4_piece_5, mode=Mode.SUBTRACT)
    with BuildSketch(Plane(origin=(16.752768553, 4.683148763, 2), x_dir=(0, 0, 1), z_dir=(0.9977851578566089, -0.06651901052377394, 0))) as fillet_4_piece_6_section:
        with BuildLine():
            CenterArc((FILLET_4_R, FILLET_4_R), FILLET_4_R, 180, 90)
            Line((0, FILLET_4_R), (0, 0))
            Line((0, 0), (FILLET_4_R, 0))
        make_face()
    fillet_4_piece_6 = extrude(amount=4.003329638, mode=Mode.PRIVATE)
    fillet_4_piece_6 = split(fillet_4_piece_6, bisect_by=Plane(origin=(19.5, 4.436551172, 2.113197557), z_dir=(-1, 0, 0)), keep=Keep.TOP, mode=Mode.PRIVATE)
    fillet_4_piece_6 = split(fillet_4_piece_6, bisect_by=Plane(origin=(18, 4.436551172, 2.113197557), z_dir=(1, 0, 0)), keep=Keep.TOP, mode=Mode.PRIVATE)
    add(fillet_4_piece_6, mode=Mode.SUBTRACT)

    # Скругление5
    fillet_5_edges = [part.edges().sort_by_distance(p)[0] for p in [
        (21.75, 0.48645112, -1.35),
        (15.75, 0.48645112, -1.75),
        (21.75, 2.48645112, -1.35),
        (15.75, 2.48645112, -1.75),
    ]]
    fillet(fillet_5_edges, radius=FILLET_5_R)


solid = part.part
